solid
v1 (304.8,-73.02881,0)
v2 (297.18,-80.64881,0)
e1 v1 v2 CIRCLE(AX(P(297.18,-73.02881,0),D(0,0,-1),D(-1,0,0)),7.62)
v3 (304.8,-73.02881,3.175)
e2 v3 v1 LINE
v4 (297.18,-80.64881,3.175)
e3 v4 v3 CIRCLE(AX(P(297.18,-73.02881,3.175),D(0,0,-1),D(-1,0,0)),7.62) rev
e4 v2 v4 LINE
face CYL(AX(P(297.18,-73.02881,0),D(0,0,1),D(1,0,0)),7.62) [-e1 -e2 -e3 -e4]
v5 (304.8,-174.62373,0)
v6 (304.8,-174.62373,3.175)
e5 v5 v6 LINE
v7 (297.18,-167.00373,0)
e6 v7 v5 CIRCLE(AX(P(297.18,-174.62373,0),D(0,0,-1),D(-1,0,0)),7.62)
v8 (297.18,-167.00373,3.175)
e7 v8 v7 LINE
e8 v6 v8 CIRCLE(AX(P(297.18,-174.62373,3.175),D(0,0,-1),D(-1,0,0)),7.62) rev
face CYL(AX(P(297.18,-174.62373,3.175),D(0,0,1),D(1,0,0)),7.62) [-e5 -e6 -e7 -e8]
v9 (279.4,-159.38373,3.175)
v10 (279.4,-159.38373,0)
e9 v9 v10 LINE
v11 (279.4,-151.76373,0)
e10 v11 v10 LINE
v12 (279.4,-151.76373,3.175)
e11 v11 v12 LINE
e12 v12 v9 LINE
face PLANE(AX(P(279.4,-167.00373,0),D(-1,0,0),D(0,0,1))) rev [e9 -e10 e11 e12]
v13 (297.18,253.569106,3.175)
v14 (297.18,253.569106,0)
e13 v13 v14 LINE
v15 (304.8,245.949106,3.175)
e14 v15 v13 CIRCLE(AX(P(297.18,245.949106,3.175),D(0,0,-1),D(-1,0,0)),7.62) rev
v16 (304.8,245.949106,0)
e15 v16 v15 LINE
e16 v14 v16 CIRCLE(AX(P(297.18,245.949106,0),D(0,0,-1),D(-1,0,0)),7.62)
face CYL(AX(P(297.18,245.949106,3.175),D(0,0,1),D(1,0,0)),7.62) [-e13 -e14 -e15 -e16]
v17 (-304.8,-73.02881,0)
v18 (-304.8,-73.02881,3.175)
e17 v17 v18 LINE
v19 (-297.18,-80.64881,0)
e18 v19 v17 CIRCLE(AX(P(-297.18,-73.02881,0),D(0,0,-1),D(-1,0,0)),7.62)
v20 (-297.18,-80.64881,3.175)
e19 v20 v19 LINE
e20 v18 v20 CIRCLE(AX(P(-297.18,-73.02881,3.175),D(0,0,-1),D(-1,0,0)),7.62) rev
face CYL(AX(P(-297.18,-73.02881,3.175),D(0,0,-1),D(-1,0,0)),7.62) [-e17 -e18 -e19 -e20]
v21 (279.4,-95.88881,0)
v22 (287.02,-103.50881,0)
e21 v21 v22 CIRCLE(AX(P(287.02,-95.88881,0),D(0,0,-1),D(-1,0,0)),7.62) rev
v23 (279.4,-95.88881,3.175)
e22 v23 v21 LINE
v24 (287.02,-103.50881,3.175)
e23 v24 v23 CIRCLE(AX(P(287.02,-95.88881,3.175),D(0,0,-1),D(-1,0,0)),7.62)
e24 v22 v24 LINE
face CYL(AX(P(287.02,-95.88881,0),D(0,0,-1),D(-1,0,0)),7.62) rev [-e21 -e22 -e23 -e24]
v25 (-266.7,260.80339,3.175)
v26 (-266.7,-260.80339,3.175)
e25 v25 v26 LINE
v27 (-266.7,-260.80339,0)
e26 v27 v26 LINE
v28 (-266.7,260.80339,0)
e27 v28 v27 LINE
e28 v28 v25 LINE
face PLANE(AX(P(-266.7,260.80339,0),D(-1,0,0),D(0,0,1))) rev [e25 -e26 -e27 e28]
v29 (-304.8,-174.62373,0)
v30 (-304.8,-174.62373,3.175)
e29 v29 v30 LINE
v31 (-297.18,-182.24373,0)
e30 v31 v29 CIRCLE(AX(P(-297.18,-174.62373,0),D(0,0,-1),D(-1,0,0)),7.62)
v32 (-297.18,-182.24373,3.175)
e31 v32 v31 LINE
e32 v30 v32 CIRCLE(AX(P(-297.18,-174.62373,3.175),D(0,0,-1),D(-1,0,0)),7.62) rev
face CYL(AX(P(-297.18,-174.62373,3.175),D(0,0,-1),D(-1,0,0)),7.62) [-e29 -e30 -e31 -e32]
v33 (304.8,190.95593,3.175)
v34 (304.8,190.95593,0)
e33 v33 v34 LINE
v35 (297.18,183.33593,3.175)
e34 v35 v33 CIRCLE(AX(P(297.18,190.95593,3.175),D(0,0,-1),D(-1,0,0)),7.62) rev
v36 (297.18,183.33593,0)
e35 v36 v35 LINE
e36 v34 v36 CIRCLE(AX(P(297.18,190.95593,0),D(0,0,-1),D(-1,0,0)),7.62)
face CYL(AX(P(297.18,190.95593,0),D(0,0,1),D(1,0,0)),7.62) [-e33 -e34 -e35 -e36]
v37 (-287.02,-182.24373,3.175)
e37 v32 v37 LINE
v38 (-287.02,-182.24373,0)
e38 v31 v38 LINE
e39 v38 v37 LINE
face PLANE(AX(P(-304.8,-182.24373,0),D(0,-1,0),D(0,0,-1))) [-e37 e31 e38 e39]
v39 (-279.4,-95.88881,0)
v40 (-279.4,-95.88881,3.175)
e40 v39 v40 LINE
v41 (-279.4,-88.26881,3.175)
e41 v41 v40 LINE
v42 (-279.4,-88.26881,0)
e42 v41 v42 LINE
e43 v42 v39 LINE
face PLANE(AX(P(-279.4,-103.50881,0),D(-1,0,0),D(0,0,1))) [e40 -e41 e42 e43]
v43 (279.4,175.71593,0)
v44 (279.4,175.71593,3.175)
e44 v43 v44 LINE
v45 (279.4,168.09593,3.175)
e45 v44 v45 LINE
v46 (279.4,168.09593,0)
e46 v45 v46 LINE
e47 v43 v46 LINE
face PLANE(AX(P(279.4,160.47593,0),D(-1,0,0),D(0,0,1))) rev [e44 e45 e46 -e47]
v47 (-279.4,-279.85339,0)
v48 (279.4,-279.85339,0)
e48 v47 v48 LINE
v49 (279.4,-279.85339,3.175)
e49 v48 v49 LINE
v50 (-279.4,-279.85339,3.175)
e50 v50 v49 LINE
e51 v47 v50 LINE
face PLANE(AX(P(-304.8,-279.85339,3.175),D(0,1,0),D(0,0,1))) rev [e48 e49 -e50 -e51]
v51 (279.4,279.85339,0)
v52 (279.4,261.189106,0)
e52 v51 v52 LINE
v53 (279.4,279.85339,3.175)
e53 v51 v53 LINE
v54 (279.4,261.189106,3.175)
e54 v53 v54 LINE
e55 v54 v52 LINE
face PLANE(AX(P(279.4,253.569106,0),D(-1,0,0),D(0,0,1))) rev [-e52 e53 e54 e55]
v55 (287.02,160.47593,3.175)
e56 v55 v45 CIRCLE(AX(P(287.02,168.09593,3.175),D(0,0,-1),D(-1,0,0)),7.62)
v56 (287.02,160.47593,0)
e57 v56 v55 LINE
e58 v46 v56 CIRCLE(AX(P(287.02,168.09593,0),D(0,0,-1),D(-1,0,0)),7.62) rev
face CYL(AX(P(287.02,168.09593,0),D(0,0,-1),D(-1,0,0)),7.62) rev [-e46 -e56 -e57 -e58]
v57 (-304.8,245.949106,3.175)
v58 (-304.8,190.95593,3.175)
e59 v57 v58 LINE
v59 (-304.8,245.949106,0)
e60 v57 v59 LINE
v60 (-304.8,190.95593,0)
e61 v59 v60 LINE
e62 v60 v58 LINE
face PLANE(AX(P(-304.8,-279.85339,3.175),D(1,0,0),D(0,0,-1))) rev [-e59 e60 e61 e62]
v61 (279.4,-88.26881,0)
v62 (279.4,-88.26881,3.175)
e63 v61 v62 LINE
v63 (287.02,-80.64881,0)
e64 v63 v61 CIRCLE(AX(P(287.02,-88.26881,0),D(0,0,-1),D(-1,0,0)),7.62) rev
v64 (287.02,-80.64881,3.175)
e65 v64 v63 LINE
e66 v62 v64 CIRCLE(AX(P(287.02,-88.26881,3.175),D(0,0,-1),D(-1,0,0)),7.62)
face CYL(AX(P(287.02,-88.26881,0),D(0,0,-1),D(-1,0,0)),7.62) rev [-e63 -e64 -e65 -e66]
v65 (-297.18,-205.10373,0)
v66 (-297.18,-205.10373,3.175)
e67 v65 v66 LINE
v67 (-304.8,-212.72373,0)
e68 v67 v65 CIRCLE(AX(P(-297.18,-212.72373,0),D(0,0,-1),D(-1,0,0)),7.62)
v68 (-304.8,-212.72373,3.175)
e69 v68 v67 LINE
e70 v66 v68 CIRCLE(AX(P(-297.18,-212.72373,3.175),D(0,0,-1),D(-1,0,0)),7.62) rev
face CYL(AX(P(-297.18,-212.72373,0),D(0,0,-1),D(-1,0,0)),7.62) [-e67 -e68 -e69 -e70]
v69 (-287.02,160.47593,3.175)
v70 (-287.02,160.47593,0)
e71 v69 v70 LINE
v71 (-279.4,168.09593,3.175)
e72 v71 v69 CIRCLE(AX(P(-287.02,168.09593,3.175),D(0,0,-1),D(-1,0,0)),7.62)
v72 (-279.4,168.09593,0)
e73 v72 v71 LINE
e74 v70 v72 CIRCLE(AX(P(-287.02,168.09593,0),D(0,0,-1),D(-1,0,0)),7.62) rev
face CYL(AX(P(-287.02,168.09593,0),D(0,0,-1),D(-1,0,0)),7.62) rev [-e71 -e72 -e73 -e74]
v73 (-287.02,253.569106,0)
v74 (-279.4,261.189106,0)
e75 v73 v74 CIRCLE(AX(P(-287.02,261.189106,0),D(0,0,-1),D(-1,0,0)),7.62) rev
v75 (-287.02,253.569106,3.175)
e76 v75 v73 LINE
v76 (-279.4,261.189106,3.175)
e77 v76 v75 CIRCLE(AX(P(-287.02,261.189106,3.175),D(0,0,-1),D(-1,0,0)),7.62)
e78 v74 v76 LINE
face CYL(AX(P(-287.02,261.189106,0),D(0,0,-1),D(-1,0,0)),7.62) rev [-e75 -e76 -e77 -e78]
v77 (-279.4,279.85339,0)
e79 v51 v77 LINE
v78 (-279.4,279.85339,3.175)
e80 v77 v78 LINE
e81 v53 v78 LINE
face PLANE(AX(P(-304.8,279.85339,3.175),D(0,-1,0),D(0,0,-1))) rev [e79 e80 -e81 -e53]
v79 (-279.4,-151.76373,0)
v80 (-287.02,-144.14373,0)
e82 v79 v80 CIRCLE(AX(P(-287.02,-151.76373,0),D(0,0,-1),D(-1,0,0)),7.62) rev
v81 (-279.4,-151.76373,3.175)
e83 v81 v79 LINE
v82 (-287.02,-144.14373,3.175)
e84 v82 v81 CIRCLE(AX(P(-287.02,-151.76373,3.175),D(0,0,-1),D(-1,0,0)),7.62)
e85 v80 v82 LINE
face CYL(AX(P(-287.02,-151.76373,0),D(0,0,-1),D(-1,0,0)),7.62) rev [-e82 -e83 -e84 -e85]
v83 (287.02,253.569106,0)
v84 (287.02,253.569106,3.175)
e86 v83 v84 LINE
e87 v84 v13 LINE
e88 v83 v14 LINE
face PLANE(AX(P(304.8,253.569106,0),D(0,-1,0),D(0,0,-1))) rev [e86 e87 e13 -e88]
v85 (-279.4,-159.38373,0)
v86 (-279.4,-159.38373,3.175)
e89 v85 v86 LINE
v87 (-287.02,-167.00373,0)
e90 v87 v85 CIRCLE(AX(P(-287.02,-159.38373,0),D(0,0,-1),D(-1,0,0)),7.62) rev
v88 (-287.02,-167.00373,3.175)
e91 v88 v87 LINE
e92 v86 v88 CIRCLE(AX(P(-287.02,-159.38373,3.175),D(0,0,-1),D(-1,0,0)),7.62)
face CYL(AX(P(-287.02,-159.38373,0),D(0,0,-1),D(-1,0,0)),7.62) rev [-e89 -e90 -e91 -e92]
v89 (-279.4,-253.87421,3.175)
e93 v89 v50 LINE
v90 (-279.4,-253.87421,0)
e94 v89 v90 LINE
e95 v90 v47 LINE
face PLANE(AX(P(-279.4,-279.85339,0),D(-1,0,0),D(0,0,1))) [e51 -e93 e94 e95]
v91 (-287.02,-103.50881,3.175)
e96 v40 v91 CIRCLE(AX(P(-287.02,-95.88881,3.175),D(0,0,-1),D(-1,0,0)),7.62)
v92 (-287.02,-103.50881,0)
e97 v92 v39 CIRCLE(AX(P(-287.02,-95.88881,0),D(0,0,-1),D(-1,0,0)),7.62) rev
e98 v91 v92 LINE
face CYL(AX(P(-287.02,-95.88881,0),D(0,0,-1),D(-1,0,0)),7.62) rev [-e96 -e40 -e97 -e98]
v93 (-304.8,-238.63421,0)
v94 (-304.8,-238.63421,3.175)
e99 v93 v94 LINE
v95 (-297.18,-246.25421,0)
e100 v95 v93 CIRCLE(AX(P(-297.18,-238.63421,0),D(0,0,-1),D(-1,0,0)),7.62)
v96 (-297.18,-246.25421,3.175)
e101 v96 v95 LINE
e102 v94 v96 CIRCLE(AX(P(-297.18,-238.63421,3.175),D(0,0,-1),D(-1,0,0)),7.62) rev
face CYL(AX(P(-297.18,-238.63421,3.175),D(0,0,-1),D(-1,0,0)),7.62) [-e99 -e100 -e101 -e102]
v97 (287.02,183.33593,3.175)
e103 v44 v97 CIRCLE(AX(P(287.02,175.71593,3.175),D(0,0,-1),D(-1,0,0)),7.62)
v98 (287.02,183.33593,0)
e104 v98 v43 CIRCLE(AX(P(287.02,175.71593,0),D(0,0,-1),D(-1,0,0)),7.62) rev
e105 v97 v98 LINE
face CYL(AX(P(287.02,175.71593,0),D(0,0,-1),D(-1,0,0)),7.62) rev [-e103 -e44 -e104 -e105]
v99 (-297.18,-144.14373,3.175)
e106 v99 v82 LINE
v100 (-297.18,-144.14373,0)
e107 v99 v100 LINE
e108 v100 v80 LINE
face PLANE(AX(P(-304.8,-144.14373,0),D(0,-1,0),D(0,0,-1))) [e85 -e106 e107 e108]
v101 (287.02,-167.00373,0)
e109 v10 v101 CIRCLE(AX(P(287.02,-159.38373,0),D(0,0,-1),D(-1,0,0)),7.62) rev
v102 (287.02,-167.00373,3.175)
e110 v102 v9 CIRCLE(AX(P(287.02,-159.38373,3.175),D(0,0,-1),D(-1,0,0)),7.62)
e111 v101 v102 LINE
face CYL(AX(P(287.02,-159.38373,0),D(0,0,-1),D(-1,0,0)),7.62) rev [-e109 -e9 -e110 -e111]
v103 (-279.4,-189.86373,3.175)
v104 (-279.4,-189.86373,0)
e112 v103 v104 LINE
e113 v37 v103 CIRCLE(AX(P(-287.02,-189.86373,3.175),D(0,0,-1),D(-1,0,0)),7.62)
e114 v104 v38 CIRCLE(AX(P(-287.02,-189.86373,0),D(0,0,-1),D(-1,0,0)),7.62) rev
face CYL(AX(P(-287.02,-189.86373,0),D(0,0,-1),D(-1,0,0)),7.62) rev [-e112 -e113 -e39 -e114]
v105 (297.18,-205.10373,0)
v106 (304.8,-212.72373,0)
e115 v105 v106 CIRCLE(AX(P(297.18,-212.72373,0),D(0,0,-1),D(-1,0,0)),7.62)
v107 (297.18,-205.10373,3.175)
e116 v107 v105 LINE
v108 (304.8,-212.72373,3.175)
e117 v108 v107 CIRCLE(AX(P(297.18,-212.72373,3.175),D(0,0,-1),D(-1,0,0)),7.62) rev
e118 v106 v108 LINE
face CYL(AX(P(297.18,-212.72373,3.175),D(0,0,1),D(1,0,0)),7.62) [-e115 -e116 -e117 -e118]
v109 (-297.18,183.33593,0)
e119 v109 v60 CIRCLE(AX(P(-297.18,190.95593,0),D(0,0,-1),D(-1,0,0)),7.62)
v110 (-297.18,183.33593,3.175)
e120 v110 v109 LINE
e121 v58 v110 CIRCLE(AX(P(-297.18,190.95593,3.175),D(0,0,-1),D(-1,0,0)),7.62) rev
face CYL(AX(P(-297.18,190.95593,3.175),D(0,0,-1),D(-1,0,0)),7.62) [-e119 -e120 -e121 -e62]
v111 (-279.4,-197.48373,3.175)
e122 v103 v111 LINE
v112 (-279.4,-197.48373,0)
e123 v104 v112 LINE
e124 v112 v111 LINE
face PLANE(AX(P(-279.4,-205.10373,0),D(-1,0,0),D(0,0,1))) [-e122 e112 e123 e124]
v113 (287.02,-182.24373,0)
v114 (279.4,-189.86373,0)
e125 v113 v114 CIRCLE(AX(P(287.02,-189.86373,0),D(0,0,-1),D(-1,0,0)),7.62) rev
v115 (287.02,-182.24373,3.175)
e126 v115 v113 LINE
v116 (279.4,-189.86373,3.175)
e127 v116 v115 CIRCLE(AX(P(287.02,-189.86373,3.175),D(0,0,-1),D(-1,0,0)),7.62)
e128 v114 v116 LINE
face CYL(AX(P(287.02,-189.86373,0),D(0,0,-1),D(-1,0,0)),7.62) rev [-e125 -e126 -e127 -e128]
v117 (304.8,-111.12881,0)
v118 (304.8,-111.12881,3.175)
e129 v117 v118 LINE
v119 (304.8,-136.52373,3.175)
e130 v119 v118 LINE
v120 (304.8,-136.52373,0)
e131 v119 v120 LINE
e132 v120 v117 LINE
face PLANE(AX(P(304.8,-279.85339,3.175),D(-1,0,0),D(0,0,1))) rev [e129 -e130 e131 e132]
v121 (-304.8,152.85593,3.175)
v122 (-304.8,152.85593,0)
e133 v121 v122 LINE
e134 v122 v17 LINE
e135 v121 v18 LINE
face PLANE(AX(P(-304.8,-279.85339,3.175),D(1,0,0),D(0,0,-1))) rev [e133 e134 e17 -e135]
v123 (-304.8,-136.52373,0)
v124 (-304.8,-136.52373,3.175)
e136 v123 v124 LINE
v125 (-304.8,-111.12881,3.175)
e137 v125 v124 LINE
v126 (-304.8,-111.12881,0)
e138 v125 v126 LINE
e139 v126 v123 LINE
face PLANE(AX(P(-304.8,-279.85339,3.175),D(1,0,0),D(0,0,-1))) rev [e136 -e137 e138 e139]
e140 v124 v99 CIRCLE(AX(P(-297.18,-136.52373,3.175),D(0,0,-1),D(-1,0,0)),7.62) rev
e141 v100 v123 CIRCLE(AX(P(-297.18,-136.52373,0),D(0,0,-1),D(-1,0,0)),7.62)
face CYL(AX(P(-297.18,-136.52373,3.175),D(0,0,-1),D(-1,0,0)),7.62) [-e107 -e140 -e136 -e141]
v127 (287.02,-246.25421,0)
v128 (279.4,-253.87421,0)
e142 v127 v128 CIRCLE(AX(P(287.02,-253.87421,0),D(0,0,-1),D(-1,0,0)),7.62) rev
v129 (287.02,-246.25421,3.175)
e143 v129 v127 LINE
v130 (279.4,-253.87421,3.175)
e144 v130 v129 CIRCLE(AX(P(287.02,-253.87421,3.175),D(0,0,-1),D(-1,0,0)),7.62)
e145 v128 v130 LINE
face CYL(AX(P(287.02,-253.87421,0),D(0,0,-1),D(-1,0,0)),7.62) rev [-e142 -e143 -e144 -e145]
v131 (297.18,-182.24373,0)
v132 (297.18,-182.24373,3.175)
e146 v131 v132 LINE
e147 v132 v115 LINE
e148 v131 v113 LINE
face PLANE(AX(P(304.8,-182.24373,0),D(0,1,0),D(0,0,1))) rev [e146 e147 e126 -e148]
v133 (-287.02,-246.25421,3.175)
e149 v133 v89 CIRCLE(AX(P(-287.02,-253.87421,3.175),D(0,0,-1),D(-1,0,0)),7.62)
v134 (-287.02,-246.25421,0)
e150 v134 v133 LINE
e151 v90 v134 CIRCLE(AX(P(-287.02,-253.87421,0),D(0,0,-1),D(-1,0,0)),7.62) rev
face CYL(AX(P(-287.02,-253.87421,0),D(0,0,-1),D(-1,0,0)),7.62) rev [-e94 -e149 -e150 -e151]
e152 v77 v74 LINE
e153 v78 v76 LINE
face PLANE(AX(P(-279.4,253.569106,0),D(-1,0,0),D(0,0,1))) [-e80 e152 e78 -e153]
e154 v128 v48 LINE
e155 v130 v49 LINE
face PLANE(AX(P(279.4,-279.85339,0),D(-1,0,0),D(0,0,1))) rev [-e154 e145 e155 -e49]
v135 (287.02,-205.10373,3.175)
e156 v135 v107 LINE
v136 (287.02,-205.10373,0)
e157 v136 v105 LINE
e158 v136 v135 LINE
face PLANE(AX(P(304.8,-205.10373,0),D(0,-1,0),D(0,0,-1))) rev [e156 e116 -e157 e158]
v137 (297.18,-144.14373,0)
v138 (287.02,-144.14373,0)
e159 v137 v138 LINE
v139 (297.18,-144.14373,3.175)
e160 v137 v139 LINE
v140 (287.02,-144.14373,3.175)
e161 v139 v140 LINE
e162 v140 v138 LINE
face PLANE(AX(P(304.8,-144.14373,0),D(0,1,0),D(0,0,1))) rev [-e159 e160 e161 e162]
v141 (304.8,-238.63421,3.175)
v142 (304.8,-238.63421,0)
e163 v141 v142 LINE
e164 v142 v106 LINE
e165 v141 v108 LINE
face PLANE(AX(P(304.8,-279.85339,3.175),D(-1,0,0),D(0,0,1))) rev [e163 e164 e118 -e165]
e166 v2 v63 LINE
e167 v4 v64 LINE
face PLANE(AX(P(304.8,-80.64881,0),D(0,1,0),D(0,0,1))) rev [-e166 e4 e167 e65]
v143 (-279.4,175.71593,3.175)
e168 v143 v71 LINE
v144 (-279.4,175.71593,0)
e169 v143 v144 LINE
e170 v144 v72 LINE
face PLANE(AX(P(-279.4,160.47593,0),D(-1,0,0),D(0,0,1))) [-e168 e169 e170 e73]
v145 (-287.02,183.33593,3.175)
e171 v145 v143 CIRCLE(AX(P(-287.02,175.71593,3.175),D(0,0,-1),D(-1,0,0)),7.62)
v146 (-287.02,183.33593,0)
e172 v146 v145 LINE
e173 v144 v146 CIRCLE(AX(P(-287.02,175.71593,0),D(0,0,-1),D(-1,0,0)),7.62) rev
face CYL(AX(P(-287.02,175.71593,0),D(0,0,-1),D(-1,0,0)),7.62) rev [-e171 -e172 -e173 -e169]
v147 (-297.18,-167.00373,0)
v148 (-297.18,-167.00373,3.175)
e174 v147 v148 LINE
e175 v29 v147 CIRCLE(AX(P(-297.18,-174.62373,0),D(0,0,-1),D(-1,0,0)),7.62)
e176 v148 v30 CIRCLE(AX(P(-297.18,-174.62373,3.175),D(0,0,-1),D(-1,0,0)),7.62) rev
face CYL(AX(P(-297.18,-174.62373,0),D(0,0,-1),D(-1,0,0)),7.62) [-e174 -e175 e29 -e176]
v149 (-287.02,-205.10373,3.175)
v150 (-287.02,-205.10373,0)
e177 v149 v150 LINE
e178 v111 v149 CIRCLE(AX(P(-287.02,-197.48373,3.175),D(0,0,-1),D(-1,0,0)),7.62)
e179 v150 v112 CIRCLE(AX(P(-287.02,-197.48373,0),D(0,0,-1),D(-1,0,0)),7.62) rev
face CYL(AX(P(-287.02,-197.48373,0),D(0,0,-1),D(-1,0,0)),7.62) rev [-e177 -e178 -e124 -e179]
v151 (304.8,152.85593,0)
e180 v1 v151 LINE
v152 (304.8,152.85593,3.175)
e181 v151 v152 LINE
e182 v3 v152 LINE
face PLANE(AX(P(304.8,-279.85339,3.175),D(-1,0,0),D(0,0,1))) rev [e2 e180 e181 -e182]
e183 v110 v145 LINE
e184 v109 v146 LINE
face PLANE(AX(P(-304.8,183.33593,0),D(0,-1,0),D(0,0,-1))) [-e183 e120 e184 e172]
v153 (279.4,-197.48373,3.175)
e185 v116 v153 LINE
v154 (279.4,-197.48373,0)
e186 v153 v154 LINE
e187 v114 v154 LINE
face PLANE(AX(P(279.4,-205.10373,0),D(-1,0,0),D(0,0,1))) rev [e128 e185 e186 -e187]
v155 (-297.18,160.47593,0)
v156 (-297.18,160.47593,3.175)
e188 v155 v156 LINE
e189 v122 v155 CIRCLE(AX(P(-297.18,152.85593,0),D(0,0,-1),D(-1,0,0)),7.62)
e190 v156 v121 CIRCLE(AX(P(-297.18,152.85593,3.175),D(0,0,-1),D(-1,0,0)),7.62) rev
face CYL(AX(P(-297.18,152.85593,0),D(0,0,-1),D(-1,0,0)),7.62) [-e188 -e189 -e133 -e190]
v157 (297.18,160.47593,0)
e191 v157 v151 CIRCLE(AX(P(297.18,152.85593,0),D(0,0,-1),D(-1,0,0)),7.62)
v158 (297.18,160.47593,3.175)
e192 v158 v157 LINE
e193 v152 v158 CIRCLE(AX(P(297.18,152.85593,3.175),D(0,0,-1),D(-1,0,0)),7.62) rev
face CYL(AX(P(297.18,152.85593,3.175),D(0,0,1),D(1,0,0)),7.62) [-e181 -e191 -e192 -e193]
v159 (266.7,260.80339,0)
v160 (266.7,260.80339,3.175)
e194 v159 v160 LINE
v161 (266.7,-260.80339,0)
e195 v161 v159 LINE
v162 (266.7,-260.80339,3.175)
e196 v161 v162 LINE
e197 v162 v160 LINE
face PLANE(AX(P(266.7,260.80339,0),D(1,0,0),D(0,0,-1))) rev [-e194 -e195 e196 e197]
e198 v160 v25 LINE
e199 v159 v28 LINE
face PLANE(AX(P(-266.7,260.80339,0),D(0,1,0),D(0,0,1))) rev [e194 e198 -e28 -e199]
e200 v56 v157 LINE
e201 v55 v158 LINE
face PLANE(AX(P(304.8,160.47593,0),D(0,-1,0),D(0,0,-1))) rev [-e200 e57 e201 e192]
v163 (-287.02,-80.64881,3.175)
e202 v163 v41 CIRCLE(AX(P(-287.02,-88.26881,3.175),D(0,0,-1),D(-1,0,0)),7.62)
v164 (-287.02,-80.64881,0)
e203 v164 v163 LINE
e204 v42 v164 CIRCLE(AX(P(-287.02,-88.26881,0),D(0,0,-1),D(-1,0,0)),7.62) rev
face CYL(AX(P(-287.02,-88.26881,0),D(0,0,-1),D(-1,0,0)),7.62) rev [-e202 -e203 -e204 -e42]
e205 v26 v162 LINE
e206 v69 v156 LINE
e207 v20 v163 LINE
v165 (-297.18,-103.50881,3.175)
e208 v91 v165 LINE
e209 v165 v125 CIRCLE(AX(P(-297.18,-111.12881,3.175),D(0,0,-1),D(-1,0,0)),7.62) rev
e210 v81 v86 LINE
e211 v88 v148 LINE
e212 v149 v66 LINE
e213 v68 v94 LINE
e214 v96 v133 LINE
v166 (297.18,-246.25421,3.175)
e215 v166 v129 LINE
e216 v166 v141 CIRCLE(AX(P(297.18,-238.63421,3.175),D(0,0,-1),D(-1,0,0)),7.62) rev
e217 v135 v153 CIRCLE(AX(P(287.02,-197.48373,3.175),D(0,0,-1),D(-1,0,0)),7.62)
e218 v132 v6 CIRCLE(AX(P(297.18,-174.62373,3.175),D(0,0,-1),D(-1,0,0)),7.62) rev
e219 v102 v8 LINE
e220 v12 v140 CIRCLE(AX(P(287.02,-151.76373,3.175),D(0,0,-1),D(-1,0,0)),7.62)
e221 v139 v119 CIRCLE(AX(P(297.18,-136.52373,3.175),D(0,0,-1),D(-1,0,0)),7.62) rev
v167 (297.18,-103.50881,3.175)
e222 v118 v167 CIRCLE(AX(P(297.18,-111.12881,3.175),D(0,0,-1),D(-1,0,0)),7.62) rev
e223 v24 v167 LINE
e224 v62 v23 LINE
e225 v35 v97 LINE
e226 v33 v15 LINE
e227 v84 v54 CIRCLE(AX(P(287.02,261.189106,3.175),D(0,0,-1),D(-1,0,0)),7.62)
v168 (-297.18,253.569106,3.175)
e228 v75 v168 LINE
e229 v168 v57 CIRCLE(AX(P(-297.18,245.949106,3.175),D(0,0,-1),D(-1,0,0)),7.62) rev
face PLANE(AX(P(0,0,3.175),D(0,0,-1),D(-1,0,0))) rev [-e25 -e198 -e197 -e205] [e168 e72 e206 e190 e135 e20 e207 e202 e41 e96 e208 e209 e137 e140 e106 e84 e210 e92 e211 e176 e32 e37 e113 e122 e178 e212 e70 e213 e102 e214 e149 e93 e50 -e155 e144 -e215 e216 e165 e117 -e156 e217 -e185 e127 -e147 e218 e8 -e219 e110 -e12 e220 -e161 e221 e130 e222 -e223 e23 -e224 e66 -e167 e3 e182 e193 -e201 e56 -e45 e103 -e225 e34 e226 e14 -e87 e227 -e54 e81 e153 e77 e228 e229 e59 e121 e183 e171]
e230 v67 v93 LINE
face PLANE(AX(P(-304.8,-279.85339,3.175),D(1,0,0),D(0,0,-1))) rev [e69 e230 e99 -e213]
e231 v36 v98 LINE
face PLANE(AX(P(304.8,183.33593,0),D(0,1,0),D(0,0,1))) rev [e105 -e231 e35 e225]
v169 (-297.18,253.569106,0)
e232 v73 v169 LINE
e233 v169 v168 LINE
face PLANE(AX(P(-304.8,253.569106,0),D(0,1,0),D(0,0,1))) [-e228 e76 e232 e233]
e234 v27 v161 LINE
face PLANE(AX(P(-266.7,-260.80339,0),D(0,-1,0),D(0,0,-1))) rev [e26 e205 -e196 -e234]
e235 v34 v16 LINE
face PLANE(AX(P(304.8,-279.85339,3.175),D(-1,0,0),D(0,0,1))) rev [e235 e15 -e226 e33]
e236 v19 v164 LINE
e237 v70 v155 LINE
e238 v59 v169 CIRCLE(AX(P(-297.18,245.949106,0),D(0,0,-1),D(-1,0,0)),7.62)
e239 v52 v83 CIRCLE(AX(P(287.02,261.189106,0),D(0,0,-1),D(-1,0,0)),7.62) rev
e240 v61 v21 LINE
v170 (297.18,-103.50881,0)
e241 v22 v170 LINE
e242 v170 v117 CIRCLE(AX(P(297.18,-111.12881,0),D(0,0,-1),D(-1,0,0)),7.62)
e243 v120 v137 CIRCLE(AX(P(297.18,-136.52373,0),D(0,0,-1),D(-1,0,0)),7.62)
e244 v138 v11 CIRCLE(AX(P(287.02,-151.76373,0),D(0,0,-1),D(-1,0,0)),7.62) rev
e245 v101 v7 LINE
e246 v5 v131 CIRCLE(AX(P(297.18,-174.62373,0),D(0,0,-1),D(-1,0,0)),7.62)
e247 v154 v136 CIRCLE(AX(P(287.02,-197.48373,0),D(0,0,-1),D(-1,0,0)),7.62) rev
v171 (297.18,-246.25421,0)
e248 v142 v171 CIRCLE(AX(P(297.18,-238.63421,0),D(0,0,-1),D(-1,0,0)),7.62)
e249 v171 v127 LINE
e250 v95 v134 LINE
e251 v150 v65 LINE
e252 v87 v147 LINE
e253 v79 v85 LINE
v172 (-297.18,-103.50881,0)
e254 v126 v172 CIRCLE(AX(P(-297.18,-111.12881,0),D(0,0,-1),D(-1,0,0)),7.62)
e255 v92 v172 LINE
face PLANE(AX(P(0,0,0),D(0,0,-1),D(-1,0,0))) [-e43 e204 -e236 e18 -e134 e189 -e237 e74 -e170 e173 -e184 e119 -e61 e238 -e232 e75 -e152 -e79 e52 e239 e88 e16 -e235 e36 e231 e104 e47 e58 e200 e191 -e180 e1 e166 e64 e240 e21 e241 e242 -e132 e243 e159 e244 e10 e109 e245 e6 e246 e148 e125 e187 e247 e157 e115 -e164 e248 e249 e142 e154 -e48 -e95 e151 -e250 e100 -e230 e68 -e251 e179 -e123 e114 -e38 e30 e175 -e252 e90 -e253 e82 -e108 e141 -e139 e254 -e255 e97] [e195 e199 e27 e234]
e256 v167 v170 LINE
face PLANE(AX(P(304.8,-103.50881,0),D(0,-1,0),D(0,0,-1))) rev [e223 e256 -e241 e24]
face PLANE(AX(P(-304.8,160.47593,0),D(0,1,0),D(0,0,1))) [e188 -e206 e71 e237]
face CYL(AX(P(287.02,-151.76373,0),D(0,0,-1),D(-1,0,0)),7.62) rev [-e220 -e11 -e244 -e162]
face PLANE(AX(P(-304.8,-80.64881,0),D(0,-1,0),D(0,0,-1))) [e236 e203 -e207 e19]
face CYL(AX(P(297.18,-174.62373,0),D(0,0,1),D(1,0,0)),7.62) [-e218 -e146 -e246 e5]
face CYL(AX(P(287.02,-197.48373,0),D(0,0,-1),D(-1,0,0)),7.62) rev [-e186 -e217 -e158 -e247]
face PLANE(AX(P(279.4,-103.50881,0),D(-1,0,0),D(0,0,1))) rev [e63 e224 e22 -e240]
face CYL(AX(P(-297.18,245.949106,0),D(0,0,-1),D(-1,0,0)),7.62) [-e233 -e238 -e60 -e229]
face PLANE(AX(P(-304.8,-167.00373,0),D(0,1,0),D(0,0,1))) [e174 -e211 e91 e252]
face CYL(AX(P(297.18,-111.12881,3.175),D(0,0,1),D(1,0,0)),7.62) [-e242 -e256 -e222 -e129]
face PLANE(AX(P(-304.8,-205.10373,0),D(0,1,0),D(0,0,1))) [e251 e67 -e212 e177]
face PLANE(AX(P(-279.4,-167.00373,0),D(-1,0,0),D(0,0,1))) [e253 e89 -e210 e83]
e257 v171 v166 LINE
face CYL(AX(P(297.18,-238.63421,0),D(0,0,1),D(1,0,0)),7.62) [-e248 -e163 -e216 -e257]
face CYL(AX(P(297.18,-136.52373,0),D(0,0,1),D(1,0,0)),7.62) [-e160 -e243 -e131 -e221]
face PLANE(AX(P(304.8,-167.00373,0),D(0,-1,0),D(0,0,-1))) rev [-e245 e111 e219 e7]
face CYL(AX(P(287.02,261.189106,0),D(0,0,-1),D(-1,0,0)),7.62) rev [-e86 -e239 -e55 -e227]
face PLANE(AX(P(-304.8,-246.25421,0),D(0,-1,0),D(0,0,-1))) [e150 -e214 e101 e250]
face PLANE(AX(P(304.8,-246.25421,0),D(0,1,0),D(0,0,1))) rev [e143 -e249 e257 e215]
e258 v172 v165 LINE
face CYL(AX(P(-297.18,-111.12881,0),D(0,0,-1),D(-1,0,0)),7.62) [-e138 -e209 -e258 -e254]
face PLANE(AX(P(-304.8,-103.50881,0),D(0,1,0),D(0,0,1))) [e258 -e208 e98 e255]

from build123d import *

# Parameters (mm, degrees)
SKETCH1_W           = 609.6
SKETCH1_H           = 559.70678
BOSS_EXTRUDE1_DEPTH = 3.175
SKETCH6_W           = 25.4
SKETCH6_H           = 33.599180378
SKETCH6_H_2         = 22.86
SKETCH6_H_3         = 26.284283972
CUT_EXTRUDE1_DEPTH  = 414.800725615
SKETCH7_W           = 533.4
SKETCH7_H           = 521.60678
CUT_EXTRUDE2_DEPTH  = 414.800725615
FILLET1_START       = -1
FILLET1_DEPTH       = 5
FILLET1_2_DEPTH     = 3.175


with BuildPart() as part:
    # Sketch1 → Boss-Extrude1 (new body)
    with BuildSketch(Plane.XY):
        Rectangle(SKETCH1_W, SKETCH1_H)
    extrude(amount=BOSS_EXTRUDE1_DEPTH)

    # Sketch6 → Cut-Extrude1 (cut, through all)
    with BuildSketch(Plane.XY.offset(3.175)):
        with Locations((292.1, -263.053799811)):
            Rectangle(SKETCH6_W, SKETCH6_H)
        with Locations((292.1, -193.67373)):
            Rectangle(SKETCH6_W, SKETCH6_H_2)
        with Locations((292.1, -155.57373)):
            Rectangle(SKETCH6_W, SKETCH6_H_2)
        with Locations((292.1, -92.07881)):
            Rectangle(SKETCH6_W, SKETCH6_H_2)
        with Locations((292.1, 171.90593)):
            Rectangle(SKETCH6_W, SKETCH6_H_2)
        with Locations((292.1, 266.711248014)):
            Rectangle(SKETCH6_W, SKETCH6_H_3)
    cut_extrude1 = extrude(amount=-CUT_EXTRUDE1_DEPTH, mode=Mode.SUBTRACT)

    # Sketch7 → Cut-Extrude2 (cut, through all)
    with BuildSketch(Plane.XY.offset(3.175)):
        Rectangle(SKETCH7_W, SKETCH7_H)
    extrude(amount=-CUT_EXTRUDE2_DEPTH, mode=Mode.SUBTRACT)

    # Mirror1: Cut-Extrude1 across plane
    add(cut_extrude1.mirror(Plane(origin=(0, 0, 0), x_dir=(0, 0, 1), z_dir=(1, 0, 0))), mode=Mode.SUBTRACT)

    # Fillet1: read off the stored shape, not the designer's step
    # Fillet1 outline → Fillet1 (cut)
    with BuildSketch(Plane.XY.offset(FILLET1_START)):
        with BuildLine():
            ThreePointArc((-297.18, -246.254209622), (-302.568153673, -244.022363295), (-304.8, -238.634209622))
            Line((-304.8, -238.634209622), (-304.8, -246.254209622))
            Line((-304.8, -246.254209622), (-297.18, -246.254209622))
        make_face()
        with BuildLine():
            ThreePointArc((-304.8, -212.72373), (-302.568153673, -207.335576327), (-297.18, -205.10373))
            Line((-297.18, -205.10373), (-304.8, -205.10373))
            Line((-304.8, -205.10373), (-304.8, -212.72373))
        make_face()
        with BuildLine():
            ThreePointArc((-297.18, -182.24373), (-302.568153673, -180.011883673), (-304.8, -174.62373))
            Line((-304.8, -174.62373), (-304.8, -182.24373))
            Line((-304.8, -182.24373), (-297.18, -182.24373))
        make_face()
        with BuildLine():
            ThreePointArc((-304.8, -174.62373), (-302.568153673, -169.235576327), (-297.18, -167.00373))
            Line((-297.18, -167.00373), (-304.8, -167.00373))
            Line((-304.8, -167.00373), (-304.8, -174.62373))
        make_face()
        with BuildLine():
            ThreePointArc((-297.18, -144.14373), (-302.568153673, -141.911883673), (-304.8, -136.52373))
            Line((-304.8, -136.52373), (-304.8, -144.14373))
            Line((-304.8, -144.14373), (-297.18, -144.14373))
        make_face()
        with BuildLine():
            ThreePointArc((-304.8, -111.12881), (-302.568153673, -105.740656327), (-297.18, -103.50881))
            Line((-297.18, -103.50881), (-304.8, -103.50881))
            Line((-304.8, -103.50881), (-304.8, -111.12881))
        make_face()
        with BuildLine():
            ThreePointArc((-297.18, -80.64881), (-302.568153673, -78.416963673), (-304.8, -73.02881))
            Line((-304.8, -73.02881), (-304.8, -80.64881))
            Line((-304.8, -80.64881), (-297.18, -80.64881))
        make_face()
        with BuildLine():
            ThreePointArc((-304.8, 152.85593), (-302.568153673, 158.244083673), (-297.18, 160.47593))
            Line((-297.18, 160.47593), (-304.8, 160.47593))
            Line((-304.8, 160.47593), (-304.8, 152.85593))
        make_face()
        with BuildLine():
            ThreePointArc((-297.18, 183.33593), (-302.568153673, 185.567776327), (-304.8, 190.95593))
            Line((-304.8, 190.95593), (-304.8, 183.33593))
            Line((-304.8, 183.33593), (-297.18, 183.33593))
        make_face()
        with BuildLine():
            ThreePointArc((-304.8, 245.949106028), (-302.568153672, 251.3372597), (-297.18, 253.569106028))
            Line((-297.18, 253.569106028), (-304.8, 253.569106028))
            Line((-304.8, 253.569106028), (-304.8, 245.949106028))
        make_face()
        with BuildLine():
            ThreePointArc((297.18, 253.569106028), (302.568153672, 251.3372597), (304.8, 245.949106028))
            Line((304.8, 245.949106028), (304.8, 253.569106028))
            Line((304.8, 253.569106028), (297.18, 253.569106028))
        make_face()
        with BuildLine():
            ThreePointArc((304.8, 190.95593), (302.568153673, 185.567776327), (297.18, 183.33593))
            Line((297.18, 183.33593), (304.8, 183.33593))
            Line((304.8, 183.33593), (304.8, 190.95593))
        make_face()
        with BuildLine():
            ThreePointArc((297.18, 160.47593), (302.568153673, 158.244083673), (304.8, 152.85593))
            Line((304.8, 152.85593), (304.8, 160.47593))
            Line((304.8, 160.47593), (297.18, 160.47593))
        make_face()
        with BuildLine():
            ThreePointArc((304.8, -73.02881), (302.568153673, -78.416963673), (297.18, -80.64881))
            Line((297.18, -80.64881), (304.8, -80.64881))
            Line((304.8, -80.64881), (304.8, -73.02881))
        make_face()
        with BuildLine():
            ThreePointArc((297.18, -103.50881), (302.568153673, -105.740656327), (304.8, -111.12881))
            Line((304.8, -111.12881), (304.8, -103.50881))
            Line((304.8, -103.50881), (297.18, -103.50881))
        make_face()
        with BuildLine():
            ThreePointArc((304.8, -136.52373), (302.568153673, -141.911883673), (297.18, -144.14373))
            Line((297.18, -144.14373), (304.8, -144.14373))
            Line((304.8, -144.14373), (304.8, -136.52373))
        make_face()
        with BuildLine():
            ThreePointArc((297.18, -167.00373), (302.568153673, -169.235576327), (304.8, -174.62373))
            Line((304.8, -174.62373), (304.8, -167.00373))
            Line((304.8, -167.00373), (297.18, -167.00373))
        make_face()
        with BuildLine():
            ThreePointArc((304.8, -174.62373), (302.568153673, -180.011883673), (297.18, -182.24373))
            Line((297.18, -182.24373), (304.8, -182.24373))
            Line((304.8, -182.24373), (304.8, -174.62373))
        make_face()
        with BuildLine():
            ThreePointArc((297.18, -205.10373), (302.568153673, -207.335576327), (304.8, -212.72373))
            Line((304.8, -212.72373), (304.8, -205.10373))
            Line((304.8, -205.10373), (297.18, -205.10373))
        make_face()
        with BuildLine():
            ThreePointArc((304.8, -238.634209622), (302.568153673, -244.022363295), (297.18, -246.254209622))
            Line((297.18, -246.254209622), (304.8, -246.254209622))
            Line((304.8, -246.254209622), (304.8, -238.634209622))
        make_face()
    extrude(amount=FILLET1_DEPTH, mode=Mode.SUBTRACT)

    # Fillet1 2 outline → Fillet1 2 (add)
    with BuildSketch(Plane.XY):
        with BuildLine():
            Line((-279.4, 253.569106028), (-279.4, 261.189106028))
            ThreePointArc((-279.4, 261.189106028), (-281.631846327, 255.800952355), (-287.02, 253.569106028))
            Line((-287.02, 253.569106028), (-279.4, 253.569106028))
        make_face()
        with BuildLine():
            Line((-279.4, -246.254209622), (-287.02, -246.254209622))
            ThreePointArc((-287.02, -246.254209622), (-281.631846327, -248.48605595), (-279.4, -253.874209622))
            Line((-279.4, -253.874209622), (-279.4, -246.254209622))
        make_face()
        with BuildLine():
            Line((-279.4, -205.10373), (-279.4, -197.48373))
            ThreePointArc((-279.4, -197.48373), (-281.631846327, -202.871883673), (-287.02, -205.10373))
            Line((-287.02, -205.10373), (-279.4, -205.10373))
        make_face()
        with BuildLine():
            Line((-279.4, -182.24373), (-287.02, -182.24373))
            ThreePointArc((-287.02, -182.24373), (-281.631846327, -184.475576327), (-279.4, -189.86373))
            Line((-279.4, -189.86373), (-279.4, -182.24373))
        make_face()
        with BuildLine():
            Line((-279.4, -167.00373), (-279.4, -159.38373))
            ThreePointArc((-279.4, -159.38373), (-281.631846327, -164.771883673), (-287.02, -167.00373))
            Line((-287.02, -167.00373), (-279.4, -167.00373))
        make_face()
        with BuildLine():
            Line((-279.4, -144.14373), (-287.02, -144.14373))
            ThreePointArc((-287.02, -144.14373), (-281.631846327, -146.375576327), (-279.4, -151.76373))
            Line((-279.4, -151.76373), (-279.4, -144.14373))
        make_face()
        with BuildLine():
            Line((-279.4, -103.50881), (-279.4, -95.88881))
            ThreePointArc((-279.4, -95.88881), (-281.631846327, -101.276963673), (-287.02, -103.50881))
            Line((-287.02, -103.50881), (-279.4, -103.50881))
        make_face()
        with BuildLine():
            Line((-279.4, -80.64881), (-287.02, -80.64881))
            ThreePointArc((-287.02, -80.64881), (-281.631846327, -82.880656327), (-279.4, -88.26881))
            Line((-279.4, -88.26881), (-279.4, -80.64881))
        make_face()
        with BuildLine():
            Line((-279.4, 160.47593), (-279.4, 168.09593))
            ThreePointArc((-279.4, 168.09593), (-281.631846327, 162.707776327), (-287.02, 160.47593))
            Line((-287.02, 160.47593), (-279.4, 160.47593))
        make_face()
        with BuildLine():
            Line((-279.4, 183.33593), (-287.02, 183.33593))
            ThreePointArc((-287.02, 183.33593), (-281.631846327, 181.104083673), (-279.4, 175.71593))
            Line((-279.4, 175.71593), (-279.4, 183.33593))
        make_face()
        with BuildLine():
            Line((279.4, -246.254209622), (279.4, -253.874209622))
            ThreePointArc((279.4, -253.874209622), (281.631846327, -248.48605595), (287.02, -246.254209622))
            Line((287.02, -246.254209622), (279.4, -246.254209622))
        make_face()
        with BuildLine():
            Line((279.4, 253.569106028), (287.02, 253.569106028))
            ThreePointArc((287.02, 253.569106028), (281.631846327, 255.800952355), (279.4, 261.189106028))
            Line((279.4, 261.189106028), (279.4, 253.569106028))
        make_face()
        with BuildLine():
            Line((279.4, 183.33593), (279.4, 175.71593))
            ThreePointArc((279.4, 175.71593), (281.631846327, 181.104083673), (287.02, 183.33593))
            Line((287.02, 183.33593), (279.4, 183.33593))
        make_face()
        with BuildLine():
            Line((279.4, 160.47593), (287.02, 160.47593))
            ThreePointArc((287.02, 160.47593), (281.631846327, 162.707776327), (279.4, 168.09593))
            Line((279.4, 168.09593), (279.4, 160.47593))
        make_face()
        with BuildLine():
            Line((279.4, -80.64881), (279.4, -88.26881))
            ThreePointArc((279.4, -88.26881), (281.631846327, -82.880656327), (287.02, -80.64881))
            Line((287.02, -80.64881), (279.4, -80.64881))
        make_face()
        with BuildLine():
            Line((279.4, -103.50881), (287.02, -103.50881))
            ThreePointArc((287.02, -103.50881), (281.631846327, -101.276963673), (279.4, -95.88881))
            Line((279.4, -95.88881), (279.4, -103.50881))
        make_face()
        with BuildLine():
            Line((279.4, -144.14373), (279.4, -151.76373))
            ThreePointArc((279.4, -151.76373), (281.631846327, -146.375576327), (287.02, -144.14373))
            Line((287.02, -144.14373), (279.4, -144.14373))
        make_face()
        with BuildLine():
            Line((279.4, -167.00373), (287.02, -167.00373))
            ThreePointArc((287.02, -167.00373), (281.631846327, -164.771883673), (279.4, -159.38373))
            Line((279.4, -159.38373), (279.4, -167.00373))
        make_face()
        with BuildLine():
            Line((279.4, -182.24373), (279.4, -189.86373))
            ThreePointArc((279.4, -189.86373), (281.631846327, -184.475576327), (287.02, -182.24373))
            Line((287.02, -182.24373), (279.4, -182.24373))
        make_face()
        with BuildLine():
            Line((279.4, -205.10373), (287.02, -205.10373))
            ThreePointArc((287.02, -205.10373), (281.631846327, -202.871883673), (279.4, -197.48373))
            Line((279.4, -197.48373), (279.4, -205.10373))
        make_face()
    extrude(amount=FILLET1_2_DEPTH)


solid = part.part
